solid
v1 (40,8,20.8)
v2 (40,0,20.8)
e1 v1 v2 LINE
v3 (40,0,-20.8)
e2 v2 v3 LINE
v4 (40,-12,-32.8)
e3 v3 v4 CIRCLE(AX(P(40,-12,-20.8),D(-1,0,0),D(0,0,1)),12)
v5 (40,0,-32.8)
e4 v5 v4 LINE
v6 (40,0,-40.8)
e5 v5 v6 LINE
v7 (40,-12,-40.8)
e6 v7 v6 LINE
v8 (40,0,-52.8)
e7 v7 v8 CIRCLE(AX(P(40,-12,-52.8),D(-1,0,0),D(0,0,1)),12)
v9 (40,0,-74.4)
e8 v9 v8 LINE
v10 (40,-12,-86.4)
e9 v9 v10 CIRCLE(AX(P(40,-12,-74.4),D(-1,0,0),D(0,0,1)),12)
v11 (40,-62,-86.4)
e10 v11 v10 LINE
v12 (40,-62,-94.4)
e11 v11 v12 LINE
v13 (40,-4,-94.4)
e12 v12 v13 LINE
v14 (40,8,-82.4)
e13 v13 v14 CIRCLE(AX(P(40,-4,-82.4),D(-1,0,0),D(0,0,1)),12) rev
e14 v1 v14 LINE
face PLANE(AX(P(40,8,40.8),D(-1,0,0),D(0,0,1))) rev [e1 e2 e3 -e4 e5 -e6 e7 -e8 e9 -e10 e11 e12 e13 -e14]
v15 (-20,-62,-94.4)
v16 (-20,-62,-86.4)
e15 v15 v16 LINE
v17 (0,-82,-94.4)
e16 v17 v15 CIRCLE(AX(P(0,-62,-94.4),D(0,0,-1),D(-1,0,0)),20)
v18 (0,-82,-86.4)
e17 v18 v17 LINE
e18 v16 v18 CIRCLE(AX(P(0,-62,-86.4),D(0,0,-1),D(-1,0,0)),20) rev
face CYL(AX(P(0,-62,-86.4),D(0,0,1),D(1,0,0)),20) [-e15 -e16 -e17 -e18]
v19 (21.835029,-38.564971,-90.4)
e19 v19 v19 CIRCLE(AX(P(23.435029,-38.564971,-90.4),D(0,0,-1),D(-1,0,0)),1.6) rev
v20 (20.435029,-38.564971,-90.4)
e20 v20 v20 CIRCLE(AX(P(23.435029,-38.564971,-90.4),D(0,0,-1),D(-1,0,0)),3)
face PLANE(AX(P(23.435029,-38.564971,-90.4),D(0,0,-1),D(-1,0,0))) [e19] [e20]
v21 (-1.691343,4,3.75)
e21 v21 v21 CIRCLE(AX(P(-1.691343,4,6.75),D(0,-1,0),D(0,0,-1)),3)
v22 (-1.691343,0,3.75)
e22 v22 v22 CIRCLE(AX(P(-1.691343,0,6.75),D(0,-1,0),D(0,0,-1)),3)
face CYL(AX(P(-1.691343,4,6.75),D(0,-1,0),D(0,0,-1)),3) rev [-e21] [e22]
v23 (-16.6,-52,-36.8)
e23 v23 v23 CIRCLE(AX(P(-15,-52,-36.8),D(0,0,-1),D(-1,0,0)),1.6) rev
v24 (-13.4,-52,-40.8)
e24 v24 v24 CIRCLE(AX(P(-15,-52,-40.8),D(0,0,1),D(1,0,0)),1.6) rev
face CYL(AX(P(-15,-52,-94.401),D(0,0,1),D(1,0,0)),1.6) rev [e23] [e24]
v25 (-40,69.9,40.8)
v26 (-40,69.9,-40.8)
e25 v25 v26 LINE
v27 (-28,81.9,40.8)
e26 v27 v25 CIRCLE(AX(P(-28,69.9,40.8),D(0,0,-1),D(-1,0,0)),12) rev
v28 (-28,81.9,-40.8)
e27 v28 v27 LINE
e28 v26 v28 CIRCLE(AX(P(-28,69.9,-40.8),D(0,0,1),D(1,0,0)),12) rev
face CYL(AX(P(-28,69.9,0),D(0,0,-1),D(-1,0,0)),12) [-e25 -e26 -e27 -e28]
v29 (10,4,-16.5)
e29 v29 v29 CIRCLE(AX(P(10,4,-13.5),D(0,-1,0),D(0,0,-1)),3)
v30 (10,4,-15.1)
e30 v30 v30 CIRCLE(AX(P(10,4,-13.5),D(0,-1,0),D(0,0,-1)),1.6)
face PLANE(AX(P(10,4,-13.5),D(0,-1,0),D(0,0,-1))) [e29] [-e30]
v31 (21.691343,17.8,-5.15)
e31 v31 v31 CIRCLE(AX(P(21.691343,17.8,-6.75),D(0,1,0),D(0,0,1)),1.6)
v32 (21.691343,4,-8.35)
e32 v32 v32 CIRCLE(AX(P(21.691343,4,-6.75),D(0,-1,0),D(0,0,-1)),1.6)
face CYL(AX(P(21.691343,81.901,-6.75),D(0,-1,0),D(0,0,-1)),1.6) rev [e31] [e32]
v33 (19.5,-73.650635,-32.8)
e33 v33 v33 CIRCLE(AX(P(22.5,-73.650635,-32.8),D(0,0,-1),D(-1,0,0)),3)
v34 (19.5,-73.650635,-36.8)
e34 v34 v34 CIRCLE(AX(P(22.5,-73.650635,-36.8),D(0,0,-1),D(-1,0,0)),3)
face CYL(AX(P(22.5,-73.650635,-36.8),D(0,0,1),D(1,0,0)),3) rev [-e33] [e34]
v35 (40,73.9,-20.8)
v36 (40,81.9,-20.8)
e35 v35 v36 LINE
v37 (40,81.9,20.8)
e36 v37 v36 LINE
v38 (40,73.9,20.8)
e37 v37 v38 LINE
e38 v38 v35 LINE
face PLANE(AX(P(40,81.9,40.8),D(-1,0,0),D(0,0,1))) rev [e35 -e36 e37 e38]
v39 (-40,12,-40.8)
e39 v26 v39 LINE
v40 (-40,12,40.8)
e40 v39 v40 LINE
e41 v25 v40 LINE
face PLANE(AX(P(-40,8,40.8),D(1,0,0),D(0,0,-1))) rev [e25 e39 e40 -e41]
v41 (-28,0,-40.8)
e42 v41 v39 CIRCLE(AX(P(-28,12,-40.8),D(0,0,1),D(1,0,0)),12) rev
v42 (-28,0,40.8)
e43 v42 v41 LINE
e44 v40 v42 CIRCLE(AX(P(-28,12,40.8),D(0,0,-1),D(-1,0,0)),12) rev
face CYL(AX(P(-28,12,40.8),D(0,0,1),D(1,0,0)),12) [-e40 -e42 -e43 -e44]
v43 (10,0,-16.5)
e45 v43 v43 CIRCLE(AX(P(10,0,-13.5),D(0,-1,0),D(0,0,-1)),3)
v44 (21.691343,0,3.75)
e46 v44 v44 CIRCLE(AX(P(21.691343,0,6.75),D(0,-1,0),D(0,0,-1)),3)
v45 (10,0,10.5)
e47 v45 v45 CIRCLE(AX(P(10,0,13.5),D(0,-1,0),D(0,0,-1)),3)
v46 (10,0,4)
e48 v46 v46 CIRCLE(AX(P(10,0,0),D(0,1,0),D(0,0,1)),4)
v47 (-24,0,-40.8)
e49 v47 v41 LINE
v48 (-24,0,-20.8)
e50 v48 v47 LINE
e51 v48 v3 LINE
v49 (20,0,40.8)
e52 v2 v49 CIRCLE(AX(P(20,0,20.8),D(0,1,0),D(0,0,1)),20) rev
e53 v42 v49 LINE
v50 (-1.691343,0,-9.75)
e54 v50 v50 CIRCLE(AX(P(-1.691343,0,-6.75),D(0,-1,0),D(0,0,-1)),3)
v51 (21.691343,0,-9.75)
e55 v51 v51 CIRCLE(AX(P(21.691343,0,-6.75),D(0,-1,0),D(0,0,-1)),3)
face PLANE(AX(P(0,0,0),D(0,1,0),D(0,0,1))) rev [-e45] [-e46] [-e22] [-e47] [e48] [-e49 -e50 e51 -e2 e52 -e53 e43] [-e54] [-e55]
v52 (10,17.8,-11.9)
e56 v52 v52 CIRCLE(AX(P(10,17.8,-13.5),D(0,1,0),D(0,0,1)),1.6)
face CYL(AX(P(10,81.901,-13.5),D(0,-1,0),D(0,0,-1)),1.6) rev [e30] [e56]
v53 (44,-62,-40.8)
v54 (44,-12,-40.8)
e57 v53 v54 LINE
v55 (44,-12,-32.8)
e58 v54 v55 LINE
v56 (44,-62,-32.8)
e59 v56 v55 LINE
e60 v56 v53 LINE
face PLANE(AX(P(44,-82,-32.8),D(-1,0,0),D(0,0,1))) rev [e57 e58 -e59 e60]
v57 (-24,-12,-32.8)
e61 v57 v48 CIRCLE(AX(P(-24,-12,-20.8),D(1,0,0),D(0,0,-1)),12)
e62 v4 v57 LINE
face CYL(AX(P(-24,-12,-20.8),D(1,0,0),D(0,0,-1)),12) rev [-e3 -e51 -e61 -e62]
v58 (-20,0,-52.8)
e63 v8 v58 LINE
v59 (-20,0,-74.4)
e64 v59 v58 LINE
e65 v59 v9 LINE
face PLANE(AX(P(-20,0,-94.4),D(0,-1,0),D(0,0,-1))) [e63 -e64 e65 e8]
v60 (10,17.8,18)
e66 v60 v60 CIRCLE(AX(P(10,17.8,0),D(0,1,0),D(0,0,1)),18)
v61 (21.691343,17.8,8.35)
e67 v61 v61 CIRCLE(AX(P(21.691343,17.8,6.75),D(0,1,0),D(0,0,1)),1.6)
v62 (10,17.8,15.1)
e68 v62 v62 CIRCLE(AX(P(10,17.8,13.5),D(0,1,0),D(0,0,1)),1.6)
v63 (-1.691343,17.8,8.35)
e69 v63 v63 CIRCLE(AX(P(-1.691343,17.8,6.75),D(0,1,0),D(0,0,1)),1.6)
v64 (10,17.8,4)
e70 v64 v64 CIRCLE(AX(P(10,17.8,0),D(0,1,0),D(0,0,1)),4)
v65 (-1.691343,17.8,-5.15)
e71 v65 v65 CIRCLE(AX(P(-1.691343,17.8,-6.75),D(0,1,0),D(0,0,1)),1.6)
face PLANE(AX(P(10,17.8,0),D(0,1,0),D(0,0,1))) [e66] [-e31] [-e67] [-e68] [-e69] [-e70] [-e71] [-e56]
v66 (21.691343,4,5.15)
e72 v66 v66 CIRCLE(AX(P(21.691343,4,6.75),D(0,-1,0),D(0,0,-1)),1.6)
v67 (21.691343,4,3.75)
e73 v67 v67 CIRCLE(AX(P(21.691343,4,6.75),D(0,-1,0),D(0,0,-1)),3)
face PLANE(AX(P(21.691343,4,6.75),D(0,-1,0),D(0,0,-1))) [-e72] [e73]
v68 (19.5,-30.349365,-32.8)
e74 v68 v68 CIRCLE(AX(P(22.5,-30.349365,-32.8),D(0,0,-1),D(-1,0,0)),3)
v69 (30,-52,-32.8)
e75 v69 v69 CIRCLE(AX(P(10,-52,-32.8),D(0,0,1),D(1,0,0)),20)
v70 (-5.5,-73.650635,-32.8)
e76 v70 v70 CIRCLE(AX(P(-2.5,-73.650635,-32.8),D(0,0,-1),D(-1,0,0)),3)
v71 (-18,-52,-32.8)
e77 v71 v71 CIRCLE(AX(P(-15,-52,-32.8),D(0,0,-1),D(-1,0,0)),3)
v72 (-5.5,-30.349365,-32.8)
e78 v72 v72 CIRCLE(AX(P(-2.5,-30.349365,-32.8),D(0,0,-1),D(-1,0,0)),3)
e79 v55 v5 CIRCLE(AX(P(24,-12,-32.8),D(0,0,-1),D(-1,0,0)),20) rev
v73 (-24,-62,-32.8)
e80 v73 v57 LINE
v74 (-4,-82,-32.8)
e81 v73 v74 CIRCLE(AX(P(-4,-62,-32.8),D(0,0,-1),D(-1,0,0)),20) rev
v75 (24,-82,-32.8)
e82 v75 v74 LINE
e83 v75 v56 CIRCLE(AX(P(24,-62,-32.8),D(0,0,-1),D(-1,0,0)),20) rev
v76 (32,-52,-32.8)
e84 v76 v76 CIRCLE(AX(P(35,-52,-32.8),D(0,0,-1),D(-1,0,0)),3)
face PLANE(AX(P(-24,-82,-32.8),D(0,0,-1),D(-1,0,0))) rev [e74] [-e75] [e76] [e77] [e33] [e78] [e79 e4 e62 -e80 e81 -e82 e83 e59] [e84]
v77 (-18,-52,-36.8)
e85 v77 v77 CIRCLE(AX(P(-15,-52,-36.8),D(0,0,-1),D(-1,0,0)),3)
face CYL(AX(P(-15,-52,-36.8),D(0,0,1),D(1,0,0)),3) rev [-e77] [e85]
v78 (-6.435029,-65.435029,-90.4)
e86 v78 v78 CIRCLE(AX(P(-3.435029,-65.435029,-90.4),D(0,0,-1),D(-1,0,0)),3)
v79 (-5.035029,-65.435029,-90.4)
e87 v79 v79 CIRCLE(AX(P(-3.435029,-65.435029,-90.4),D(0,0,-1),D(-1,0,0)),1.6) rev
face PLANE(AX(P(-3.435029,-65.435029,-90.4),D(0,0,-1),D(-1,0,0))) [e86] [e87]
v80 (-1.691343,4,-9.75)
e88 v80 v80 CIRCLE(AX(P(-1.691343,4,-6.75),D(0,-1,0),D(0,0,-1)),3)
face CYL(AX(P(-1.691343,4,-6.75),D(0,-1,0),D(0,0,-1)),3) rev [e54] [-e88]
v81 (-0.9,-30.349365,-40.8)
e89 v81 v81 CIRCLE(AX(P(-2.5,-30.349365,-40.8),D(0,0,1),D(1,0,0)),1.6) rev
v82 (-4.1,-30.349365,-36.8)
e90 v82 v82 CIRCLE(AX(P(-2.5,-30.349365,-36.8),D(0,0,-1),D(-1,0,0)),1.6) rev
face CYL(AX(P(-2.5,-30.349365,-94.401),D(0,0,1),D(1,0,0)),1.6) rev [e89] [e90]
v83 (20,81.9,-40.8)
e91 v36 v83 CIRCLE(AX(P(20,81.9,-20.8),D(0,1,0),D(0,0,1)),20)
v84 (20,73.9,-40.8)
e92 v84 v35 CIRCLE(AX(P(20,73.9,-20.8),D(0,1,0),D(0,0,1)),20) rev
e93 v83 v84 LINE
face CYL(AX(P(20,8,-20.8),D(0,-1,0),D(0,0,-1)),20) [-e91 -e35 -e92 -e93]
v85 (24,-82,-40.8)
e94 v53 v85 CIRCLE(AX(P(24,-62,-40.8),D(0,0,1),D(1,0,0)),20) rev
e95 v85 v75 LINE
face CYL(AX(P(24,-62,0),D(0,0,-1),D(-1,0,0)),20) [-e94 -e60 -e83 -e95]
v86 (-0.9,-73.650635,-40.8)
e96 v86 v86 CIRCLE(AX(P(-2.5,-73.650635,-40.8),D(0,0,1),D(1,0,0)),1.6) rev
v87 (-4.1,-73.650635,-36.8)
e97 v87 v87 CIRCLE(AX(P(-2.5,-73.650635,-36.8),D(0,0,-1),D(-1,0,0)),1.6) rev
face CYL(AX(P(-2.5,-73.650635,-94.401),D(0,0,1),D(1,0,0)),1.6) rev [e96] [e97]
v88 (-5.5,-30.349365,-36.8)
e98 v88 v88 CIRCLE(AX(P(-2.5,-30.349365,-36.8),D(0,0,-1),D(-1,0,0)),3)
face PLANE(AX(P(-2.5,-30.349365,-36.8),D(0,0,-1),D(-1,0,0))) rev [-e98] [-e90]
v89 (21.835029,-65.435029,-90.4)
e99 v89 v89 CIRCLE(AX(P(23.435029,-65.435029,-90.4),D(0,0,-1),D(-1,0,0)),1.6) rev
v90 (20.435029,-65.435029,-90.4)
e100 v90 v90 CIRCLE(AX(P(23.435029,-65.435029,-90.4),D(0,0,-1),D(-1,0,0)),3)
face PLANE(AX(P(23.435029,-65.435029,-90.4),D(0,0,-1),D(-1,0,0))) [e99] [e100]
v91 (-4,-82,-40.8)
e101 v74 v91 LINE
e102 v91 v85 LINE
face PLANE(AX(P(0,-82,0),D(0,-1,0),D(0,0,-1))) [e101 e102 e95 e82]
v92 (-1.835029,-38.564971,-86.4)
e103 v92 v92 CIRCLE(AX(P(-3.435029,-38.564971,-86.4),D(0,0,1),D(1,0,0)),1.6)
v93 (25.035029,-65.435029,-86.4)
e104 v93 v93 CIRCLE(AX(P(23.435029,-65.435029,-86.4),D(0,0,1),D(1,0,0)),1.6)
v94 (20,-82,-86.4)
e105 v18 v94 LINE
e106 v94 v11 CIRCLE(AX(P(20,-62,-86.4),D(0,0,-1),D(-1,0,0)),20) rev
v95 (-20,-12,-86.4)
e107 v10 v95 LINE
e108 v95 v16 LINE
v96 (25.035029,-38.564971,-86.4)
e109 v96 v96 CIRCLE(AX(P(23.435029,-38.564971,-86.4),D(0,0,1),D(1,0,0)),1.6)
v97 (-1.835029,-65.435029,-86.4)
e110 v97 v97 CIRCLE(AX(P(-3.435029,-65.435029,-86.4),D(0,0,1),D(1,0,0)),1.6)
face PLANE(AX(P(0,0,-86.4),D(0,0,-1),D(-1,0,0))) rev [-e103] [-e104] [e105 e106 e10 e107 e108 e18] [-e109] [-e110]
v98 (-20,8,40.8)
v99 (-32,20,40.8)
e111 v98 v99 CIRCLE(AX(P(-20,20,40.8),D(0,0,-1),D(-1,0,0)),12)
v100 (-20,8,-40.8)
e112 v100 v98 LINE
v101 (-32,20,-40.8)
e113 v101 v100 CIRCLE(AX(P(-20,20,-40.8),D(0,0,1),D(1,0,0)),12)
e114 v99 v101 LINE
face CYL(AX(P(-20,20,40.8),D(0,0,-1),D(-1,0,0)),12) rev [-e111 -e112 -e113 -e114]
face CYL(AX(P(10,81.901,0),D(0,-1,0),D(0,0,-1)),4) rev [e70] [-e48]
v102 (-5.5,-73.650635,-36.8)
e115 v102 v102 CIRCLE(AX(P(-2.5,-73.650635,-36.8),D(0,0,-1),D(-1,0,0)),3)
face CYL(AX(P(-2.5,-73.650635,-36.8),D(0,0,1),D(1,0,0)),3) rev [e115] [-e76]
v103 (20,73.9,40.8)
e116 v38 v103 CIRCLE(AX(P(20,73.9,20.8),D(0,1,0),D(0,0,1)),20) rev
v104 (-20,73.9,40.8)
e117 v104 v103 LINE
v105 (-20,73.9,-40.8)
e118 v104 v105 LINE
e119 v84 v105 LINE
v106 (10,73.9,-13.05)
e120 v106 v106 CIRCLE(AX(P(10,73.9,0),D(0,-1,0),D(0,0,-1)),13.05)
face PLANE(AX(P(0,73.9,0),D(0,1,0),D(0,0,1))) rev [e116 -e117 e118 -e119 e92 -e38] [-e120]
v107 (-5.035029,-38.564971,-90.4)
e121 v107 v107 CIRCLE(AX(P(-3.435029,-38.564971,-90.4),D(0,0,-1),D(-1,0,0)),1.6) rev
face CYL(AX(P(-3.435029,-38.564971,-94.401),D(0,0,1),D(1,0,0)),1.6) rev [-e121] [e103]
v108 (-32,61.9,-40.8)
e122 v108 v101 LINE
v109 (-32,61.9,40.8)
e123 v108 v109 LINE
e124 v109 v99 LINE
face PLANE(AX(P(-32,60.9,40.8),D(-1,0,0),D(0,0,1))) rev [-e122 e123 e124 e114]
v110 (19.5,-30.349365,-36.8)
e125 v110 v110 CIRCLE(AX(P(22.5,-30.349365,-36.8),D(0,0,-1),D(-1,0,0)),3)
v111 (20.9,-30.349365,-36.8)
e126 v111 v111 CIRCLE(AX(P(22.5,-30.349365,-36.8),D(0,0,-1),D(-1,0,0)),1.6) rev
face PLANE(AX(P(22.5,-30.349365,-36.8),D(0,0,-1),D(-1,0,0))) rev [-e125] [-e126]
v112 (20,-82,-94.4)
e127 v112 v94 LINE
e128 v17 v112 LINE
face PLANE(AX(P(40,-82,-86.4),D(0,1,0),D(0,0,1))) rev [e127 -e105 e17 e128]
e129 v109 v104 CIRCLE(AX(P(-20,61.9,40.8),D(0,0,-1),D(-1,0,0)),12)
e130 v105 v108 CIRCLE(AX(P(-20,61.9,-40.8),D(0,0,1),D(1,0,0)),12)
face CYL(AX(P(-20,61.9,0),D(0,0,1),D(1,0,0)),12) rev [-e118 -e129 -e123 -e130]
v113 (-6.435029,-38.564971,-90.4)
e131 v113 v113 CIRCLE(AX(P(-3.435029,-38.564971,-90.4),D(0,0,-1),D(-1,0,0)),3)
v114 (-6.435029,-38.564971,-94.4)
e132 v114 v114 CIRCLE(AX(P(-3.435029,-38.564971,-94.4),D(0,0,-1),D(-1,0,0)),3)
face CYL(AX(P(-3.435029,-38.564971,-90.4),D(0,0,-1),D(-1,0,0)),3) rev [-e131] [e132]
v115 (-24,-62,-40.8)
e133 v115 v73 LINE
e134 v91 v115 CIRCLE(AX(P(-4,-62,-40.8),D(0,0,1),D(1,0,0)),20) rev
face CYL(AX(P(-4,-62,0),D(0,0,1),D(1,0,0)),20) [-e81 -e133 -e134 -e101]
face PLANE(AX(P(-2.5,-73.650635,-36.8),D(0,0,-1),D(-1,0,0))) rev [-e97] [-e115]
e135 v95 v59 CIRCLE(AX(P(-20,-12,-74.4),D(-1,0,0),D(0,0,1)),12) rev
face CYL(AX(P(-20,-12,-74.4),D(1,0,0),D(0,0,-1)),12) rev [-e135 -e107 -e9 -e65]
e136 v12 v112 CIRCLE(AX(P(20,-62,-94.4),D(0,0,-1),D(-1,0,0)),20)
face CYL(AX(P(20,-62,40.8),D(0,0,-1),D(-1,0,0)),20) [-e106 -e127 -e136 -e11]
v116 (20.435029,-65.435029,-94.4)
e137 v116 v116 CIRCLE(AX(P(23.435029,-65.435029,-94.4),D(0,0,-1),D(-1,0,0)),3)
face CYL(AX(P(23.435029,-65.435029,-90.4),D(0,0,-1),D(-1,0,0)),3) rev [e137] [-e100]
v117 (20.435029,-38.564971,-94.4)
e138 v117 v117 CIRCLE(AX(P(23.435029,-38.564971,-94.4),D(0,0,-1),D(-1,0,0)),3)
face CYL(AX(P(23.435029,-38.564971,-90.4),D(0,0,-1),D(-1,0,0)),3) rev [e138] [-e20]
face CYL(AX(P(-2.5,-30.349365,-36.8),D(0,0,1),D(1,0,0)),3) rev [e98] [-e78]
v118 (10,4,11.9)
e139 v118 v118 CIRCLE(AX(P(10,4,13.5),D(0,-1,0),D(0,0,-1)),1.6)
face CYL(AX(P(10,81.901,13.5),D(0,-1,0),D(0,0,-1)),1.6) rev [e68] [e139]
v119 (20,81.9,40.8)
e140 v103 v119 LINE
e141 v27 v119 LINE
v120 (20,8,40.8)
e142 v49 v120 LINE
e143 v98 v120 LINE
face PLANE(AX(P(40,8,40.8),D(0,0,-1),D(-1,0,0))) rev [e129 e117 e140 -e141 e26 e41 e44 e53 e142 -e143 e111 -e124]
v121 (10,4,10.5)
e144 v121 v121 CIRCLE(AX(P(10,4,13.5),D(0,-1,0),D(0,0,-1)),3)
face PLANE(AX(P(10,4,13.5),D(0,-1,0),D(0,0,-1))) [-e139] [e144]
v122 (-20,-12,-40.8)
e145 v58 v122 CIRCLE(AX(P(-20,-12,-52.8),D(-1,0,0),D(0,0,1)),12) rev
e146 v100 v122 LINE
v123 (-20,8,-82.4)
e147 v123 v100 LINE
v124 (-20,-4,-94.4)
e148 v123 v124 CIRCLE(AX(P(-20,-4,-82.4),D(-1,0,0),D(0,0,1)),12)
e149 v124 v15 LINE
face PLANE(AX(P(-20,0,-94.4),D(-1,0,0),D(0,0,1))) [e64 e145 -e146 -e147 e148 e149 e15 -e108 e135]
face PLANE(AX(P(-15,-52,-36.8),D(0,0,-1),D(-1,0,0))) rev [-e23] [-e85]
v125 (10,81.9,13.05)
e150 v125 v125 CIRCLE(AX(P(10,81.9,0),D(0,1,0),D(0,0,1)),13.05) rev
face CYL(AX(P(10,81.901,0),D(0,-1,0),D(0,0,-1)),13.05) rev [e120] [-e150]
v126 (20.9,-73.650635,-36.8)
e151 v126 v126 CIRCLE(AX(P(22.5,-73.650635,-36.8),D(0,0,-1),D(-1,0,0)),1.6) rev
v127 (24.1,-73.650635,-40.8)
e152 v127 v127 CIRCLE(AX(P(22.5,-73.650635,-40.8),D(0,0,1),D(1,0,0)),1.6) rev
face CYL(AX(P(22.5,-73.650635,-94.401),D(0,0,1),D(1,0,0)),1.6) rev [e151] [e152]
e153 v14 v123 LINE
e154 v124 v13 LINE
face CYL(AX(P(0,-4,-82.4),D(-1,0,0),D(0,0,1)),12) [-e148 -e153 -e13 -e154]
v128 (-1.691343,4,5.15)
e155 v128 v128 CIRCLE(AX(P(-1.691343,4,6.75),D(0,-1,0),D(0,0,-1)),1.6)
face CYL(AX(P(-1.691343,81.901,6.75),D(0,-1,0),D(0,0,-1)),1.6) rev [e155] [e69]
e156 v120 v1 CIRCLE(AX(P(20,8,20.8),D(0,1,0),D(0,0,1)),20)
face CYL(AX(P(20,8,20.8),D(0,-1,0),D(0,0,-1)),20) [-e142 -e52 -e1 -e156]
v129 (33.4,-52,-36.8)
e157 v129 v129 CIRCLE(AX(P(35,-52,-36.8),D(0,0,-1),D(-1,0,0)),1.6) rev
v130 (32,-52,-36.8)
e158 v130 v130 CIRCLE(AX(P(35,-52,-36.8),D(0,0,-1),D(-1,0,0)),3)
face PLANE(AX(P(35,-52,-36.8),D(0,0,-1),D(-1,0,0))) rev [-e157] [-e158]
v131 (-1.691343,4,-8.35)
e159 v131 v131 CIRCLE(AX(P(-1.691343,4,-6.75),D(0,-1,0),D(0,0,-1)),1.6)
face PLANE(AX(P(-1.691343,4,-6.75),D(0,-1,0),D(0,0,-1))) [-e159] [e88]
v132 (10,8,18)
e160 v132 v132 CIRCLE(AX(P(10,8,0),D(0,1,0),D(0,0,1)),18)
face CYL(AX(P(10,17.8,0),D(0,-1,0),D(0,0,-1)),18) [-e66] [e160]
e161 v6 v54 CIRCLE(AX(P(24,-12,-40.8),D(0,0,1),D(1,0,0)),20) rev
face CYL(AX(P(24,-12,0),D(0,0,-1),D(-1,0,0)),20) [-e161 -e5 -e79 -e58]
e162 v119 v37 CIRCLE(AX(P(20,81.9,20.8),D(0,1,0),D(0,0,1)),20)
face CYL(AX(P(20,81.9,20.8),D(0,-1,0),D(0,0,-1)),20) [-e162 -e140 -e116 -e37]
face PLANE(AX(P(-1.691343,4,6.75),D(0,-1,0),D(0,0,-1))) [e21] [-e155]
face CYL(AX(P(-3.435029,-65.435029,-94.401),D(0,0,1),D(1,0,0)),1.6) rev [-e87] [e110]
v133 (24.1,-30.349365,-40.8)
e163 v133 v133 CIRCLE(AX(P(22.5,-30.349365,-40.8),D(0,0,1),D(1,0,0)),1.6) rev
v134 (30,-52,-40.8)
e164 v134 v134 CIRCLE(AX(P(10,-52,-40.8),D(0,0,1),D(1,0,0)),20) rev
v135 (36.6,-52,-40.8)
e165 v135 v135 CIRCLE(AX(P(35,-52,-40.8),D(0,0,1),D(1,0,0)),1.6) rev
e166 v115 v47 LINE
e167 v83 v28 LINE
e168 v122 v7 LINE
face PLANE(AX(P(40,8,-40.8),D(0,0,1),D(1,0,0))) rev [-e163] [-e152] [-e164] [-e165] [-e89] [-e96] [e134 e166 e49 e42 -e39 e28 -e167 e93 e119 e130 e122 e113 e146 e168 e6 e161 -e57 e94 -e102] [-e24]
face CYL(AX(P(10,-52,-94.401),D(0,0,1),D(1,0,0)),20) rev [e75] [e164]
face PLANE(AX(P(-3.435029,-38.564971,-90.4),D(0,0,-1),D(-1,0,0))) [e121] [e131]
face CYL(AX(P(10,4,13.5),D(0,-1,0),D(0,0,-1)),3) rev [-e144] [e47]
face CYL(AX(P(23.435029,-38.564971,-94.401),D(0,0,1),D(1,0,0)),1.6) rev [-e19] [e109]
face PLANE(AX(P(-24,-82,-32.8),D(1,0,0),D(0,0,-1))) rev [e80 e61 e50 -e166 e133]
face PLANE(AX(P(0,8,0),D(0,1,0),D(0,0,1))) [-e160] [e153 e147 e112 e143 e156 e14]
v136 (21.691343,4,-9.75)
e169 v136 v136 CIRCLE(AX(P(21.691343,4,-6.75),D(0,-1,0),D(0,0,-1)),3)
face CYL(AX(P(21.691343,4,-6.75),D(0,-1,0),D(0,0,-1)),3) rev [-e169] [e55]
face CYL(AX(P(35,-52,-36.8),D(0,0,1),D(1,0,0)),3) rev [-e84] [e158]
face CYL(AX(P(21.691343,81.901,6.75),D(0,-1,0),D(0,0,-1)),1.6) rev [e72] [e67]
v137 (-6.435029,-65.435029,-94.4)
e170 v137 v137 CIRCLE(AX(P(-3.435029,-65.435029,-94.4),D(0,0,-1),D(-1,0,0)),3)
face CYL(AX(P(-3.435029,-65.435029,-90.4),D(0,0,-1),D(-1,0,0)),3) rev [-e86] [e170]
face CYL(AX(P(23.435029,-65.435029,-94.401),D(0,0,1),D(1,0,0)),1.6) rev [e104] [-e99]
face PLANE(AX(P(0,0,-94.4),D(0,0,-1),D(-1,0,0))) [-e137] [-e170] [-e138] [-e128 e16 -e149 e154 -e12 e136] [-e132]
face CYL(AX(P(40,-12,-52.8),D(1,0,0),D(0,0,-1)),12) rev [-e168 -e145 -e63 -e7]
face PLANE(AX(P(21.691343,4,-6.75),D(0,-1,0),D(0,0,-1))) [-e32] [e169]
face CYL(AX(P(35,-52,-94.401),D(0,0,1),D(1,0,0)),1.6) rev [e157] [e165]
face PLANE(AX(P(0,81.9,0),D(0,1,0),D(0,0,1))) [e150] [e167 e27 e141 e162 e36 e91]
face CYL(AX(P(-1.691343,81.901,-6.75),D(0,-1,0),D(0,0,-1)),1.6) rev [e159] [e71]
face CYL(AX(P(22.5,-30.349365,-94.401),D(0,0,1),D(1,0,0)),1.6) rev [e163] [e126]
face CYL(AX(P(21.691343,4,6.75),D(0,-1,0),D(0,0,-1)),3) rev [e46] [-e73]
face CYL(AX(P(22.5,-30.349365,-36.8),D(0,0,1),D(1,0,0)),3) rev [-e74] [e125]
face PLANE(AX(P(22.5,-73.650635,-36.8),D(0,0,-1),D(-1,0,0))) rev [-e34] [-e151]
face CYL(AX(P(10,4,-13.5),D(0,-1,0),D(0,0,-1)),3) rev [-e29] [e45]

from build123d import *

# Parameters (mm, degrees)
SKETCH_1_W                      = 80
SKETCH_1_H                      = 81.6
EXTRUDE_1_DEPTH                 = 8
SKETCH_2_W                      = 8
SKETCH_2_H                      = 81.6
EXTRUDE_2_DEPTH                 = 52.9
SKETCH_10_W                     = 8
SKETCH_10_H                     = 81.6
EXTRUDE_7_DEPTH                 = 13
SKETCH_11_W                     = 80
SKETCH_11_H                     = 81.6
EXTRUDE_8_DEPTH                 = 8
SKETCH_6_R                      = 18
EXTRUDE_4_DEPTH                 = 9.8
SKETCH_4_R                      = 1.6
SKETCH_4_R_2                    = 4
CUT_EXTRUDE_1_DEPTH             = 94.412258296
CUT_EXTRUDE_1_DIRECTION_2_REACH = 95.412
CUT_EXTRUDE_3_REACH             = 95.412
SKETCH_12_R                     = 13.05
SKETCH_21_R                     = 3
CUT_EXTRUDE_10_DEPTH            = 4
SKETCH1_W                       = 68
SKETCH1_H                       = 8
BOSS_EXTRUDE1_DEPTH             = 82
SKETCH2_W                       = 60
SKETCH2_H                       = 8
BOSS_EXTRUDE2_DEPTH             = 53.6
SKETCH3_W                       = 60
SKETCH3_H                       = 90
BOSS_EXTRUDE3_DEPTH             = 8
CUT_EXTRUDE1_REACH              = 121.87
SKETCH4_R                       = 20
SKETCH4_R_2                     = 1.6
CUT_EXTRUDE2_REACH              = 176.266
SKETCH5_R                       = 1.6
SKETCH6_R                       = 3
CUT_EXTRUDE3_DEPTH              = 4
SKETCH7_R                       = 3
CUT_EXTRUDE4_DEPTH              = 4
FILLET1_R                       = 12
FILLET2_R                       = 20


with BuildPart() as part:
    # 草图1 → 凸台-拉伸1 (new body)
    with BuildSketch(Plane(origin=(0, 0, 0), x_dir=(1, 0, 0), z_dir=(0, 1, 0))):
        Rectangle(SKETCH_1_W, SKETCH_1_H)
    extrude(amount=EXTRUDE_1_DEPTH)

    # 草图2 → 凸台-拉伸2 (add)
    with BuildSketch(Plane(origin=(0, 8, 0), x_dir=(1, 0, 0), z_dir=(0, 1, 0))):
        with Locations((-36, 0)):
            Rectangle(SKETCH_2_W, SKETCH_2_H)
    extrude(amount=EXTRUDE_2_DEPTH)

    # 草图10 → 凸台-拉伸7 (add)
    with BuildSketch(Plane(origin=(0, 60.9, 0), x_dir=(1, 0, 0), z_dir=(0, 1, 0))):
        with Locations((-36, 0)):
            Rectangle(SKETCH_10_W, SKETCH_10_H)
    extrude(amount=EXTRUDE_7_DEPTH)

    # 草图11 → 凸台-拉伸8 (add)
    with BuildSketch(Plane(origin=(0, 73.9, 0), x_dir=(1, 0, 0), z_dir=(0, 1, 0))):
        Rectangle(SKETCH_11_W, SKETCH_11_H)
    extrude(amount=EXTRUDE_8_DEPTH)

    # 草图6 → 凸台-拉伸4 (add)
    with BuildSketch(Plane(origin=(0, 8, 0), x_dir=(1, 0, 0), z_dir=(0, 1, 0))):
        with Locations(Location((10, 0, 0), (0, 0, 270))):
            Circle(SKETCH_6_R)
    extrude(amount=EXTRUDE_4_DEPTH)

    # 草图4 → 切除-拉伸1 (cut)
    with BuildSketch(Plane(origin=(0, 8, 0), x_dir=(1, 0, 0), z_dir=(0, 1, 0))):
        with Locations(Location((10, 13.5, 0), (0, 0, 270))):
            Circle(SKETCH_4_R)
        with Locations(Location((21.691342951, 6.75, 0), (0, 0, 270))):
            Circle(SKETCH_4_R)
        with Locations(Location((21.691342951, -6.75, 0), (0, 0, 270))):
            Circle(SKETCH_4_R)
        with Locations(Location((10, -13.5, 0), (0, 0, 270))):
            Circle(SKETCH_4_R)
        with Locations(Location((-1.691342951, -6.75, 0), (0, 0, 270))):
            Circle(SKETCH_4_R)
        with Locations(Location((-1.691342951, 6.75, 0), (0, 0, 270))):
            Circle(SKETCH_4_R)
        with Locations(Location((10, 0, 0), (0, 0, 270))):
            Circle(SKETCH_4_R_2)
    extrude(amount=-CUT_EXTRUDE_1_DEPTH, mode=Mode.SUBTRACT)

    # 草图4 → 切除-拉伸1 direction 2 (cut, up to next)
    with BuildSketch(Plane(origin=(0, 8, 0), x_dir=(1, 0, 0), z_dir=(0, 1, 0)), mode=Mode.PRIVATE) as cut_extrude_1_direction_2_sk1:
        with Locations(Location((10, 13.5, 0), (0, 0, 270))):
            Circle(SKETCH_4_R)
    cut_extrude_1_direction_2_tool1 = extrude(cut_extrude_1_direction_2_sk1.sketch, amount=CUT_EXTRUDE_1_DIRECTION_2_REACH, mode=Mode.PRIVATE) & part.part
    # 草图4 → 切除-拉伸1 direction 2 (cut, up to next)
    with BuildSketch(Plane(origin=(0, 8, 0), x_dir=(1, 0, 0), z_dir=(0, 1, 0)), mode=Mode.PRIVATE) as cut_extrude_1_direction_2_sk2:
        with Locations(Location((21.691342951, 6.75, 0), (0, 0, 270))):
            Circle(SKETCH_4_R)
    cut_extrude_1_direction_2_tool2 = extrude(cut_extrude_1_direction_2_sk2.sketch, amount=CUT_EXTRUDE_1_DIRECTION_2_REACH, mode=Mode.PRIVATE) & part.part
    # 草图4 → 切除-拉伸1 direction 2 (cut, up to next)
    with BuildSketch(Plane(origin=(0, 8, 0), x_dir=(1, 0, 0), z_dir=(0, 1, 0)), mode=Mode.PRIVATE) as cut_extrude_1_direction_2_sk3:
        with Locations(Location((21.691342951, -6.75, 0), (0, 0, 270))):
            Circle(SKETCH_4_R)
    cut_extrude_1_direction_2_tool3 = extrude(cut_extrude_1_direction_2_sk3.sketch, amount=CUT_EXTRUDE_1_DIRECTION_2_REACH, mode=Mode.PRIVATE) & part.part
    # 草图4 → 切除-拉伸1 direction 2 (cut, up to next)
    with BuildSketch(Plane(origin=(0, 8, 0), x_dir=(1, 0, 0), z_dir=(0, 1, 0)), mode=Mode.PRIVATE) as cut_extrude_1_direction_2_sk4:
        with Locations(Location((10, -13.5, 0), (0, 0, 270))):
            Circle(SKETCH_4_R)
    cut_extrude_1_direction_2_tool4 = extrude(cut_extrude_1_direction_2_sk4.sketch, amount=CUT_EXTRUDE_1_DIRECTION_2_REACH, mode=Mode.PRIVATE) & part.part
    # 草图4 → 切除-拉伸1 direction 2 (cut, up to next)
    with BuildSketch(Plane(origin=(0, 8, 0), x_dir=(1, 0, 0), z_dir=(0, 1, 0)), mode=Mode.PRIVATE) as cut_extrude_1_direction_2_sk5:
        with Locations(Location((-1.691342951, -6.75, 0), (0, 0, 270))):
            Circle(SKETCH_4_R)
    cut_extrude_1_direction_2_tool5 = extrude(cut_extrude_1_direction_2_sk5.sketch, amount=CUT_EXTRUDE_1_DIRECTION_2_REACH, mode=Mode.PRIVATE) & part.part
    # 草图4 → 切除-拉伸1 direction 2 (cut, up to next)
    with BuildSketch(Plane(origin=(0, 8, 0), x_dir=(1, 0, 0), z_dir=(0, 1, 0)), mode=Mode.PRIVATE) as cut_extrude_1_direction_2_sk6:
        with Locations(Location((-1.691342951, 6.75, 0), (0, 0, 270))):
            Circle(SKETCH_4_R)
    cut_extrude_1_direction_2_tool6 = extrude(cut_extrude_1_direction_2_sk6.sketch, amount=CUT_EXTRUDE_1_DIRECTION_2_REACH, mode=Mode.PRIVATE) & part.part
    # 草图4 → 切除-拉伸1 direction 2 (cut, up to next)
    with BuildSketch(Plane(origin=(0, 8, 0), x_dir=(1, 0, 0), z_dir=(0, 1, 0)), mode=Mode.PRIVATE) as cut_extrude_1_direction_2_sk7:
        with Locations(Location((10, 0, 0), (0, 0, 270))):
            Circle(SKETCH_4_R_2)
    cut_extrude_1_direction_2_tool7 = extrude(cut_extrude_1_direction_2_sk7.sketch, amount=CUT_EXTRUDE_1_DIRECTION_2_REACH, mode=Mode.PRIVATE) & part.part
    add(cut_extrude_1_direction_2_tool1.solids().sort_by_distance((10, 8, -13.5))[0], mode=Mode.SUBTRACT)
    add(cut_extrude_1_direction_2_tool2.solids().sort_by_distance((21.691343, 8, -6.75))[0], mode=Mode.SUBTRACT)
    add(cut_extrude_1_direction_2_tool3.solids().sort_by_distance((21.691343, 8, 6.75))[0], mode=Mode.SUBTRACT)
    add(cut_extrude_1_direction_2_tool4.solids().sort_by_distance((10, 8, 13.5))[0], mode=Mode.SUBTRACT)
    add(cut_extrude_1_direction_2_tool5.solids().sort_by_distance((-1.691343, 8, 6.75))[0], mode=Mode.SUBTRACT)
    add(cut_extrude_1_direction_2_tool6.solids().sort_by_distance((-1.691343, 8, -6.75))[0], mode=Mode.SUBTRACT)
    add(cut_extrude_1_direction_2_tool7.solids().sort_by_distance((10, 8, 0))[0], mode=Mode.SUBTRACT)

    # 草图12 → 切除-拉伸3 (cut, up to next)
    with BuildSketch(Plane(origin=(0, 73.9, 0), x_dir=(-1, 0, 0), z_dir=(0, -1, 0)), mode=Mode.PRIVATE) as cut_extrude_3_sk1:
        with Locations(Location((-10, 0, 0), (0, 0, 90))):
            Circle(SKETCH_12_R)
    cut_extrude_3_tool1 = extrude(cut_extrude_3_sk1.sketch, amount=-CUT_EXTRUDE_3_REACH, mode=Mode.PRIVATE) & part.part
    add(cut_extrude_3_tool1.solids().sort_by_distance((10, 73.9, 0))[0], mode=Mode.SUBTRACT)

    # 草图21 → 切除-拉伸10 (cut)
    with BuildSketch(Plane(origin=(0, 0, 0), x_dir=(-1, 0, 0), z_dir=(0, -1, 0))):
        with Locations(Location((-10, -13.5, 0), (0, 0, 90))):
            Circle(SKETCH_21_R)
        with Locations(Location((-21.691342951, -6.75, 0), (0, 0, 90))):
            Circle(SKETCH_21_R)
        with Locations(Location((-21.691342951, 6.75, 0), (0, 0, 90))):
            Circle(SKETCH_21_R)
        with Locations(Location((-10, 13.5, 0), (0, 0, 90))):
            Circle(SKETCH_21_R)
        with Locations(Location((1.691342951, 6.75, 0), (0, 0, 90))):
            Circle(SKETCH_21_R)
        with Locations(Location((1.691342951, -6.75, 0), (0, 0, 90))):
            Circle(SKETCH_21_R)
    extrude(amount=-CUT_EXTRUDE_10_DEPTH, mode=Mode.SUBTRACT)

    # Sketch1 → Boss-Extrude1 (add)
    with BuildSketch(Plane(origin=(0, 0, 0), x_dir=(-1, 0, 0), z_dir=(0, -1, 0))):
        with Locations((-10, 36.8)):
            Rectangle(SKETCH1_W, SKETCH1_H)
    extrude(amount=BOSS_EXTRUDE1_DEPTH)

    # Sketch2 → Boss-Extrude2 (add)
    with BuildSketch(Plane(origin=(0.8, 0, -40.8), x_dir=(1, 0, 0), z_dir=(0, 0, 1))):
        with Locations((9.2, 4)):
            Rectangle(SKETCH2_W, SKETCH2_H)
    extrude(amount=-BOSS_EXTRUDE2_DEPTH)

    # Sketch3 → Boss-Extrude3 (add)
    with BuildSketch(Plane(origin=(0, 94.4, -94.4), x_dir=(-1, 0, 0), z_dir=(0, 0, 1))):
        with Locations((-10, 131.4)):
            Rectangle(SKETCH3_W, SKETCH3_H)
    extrude(amount=BOSS_EXTRUDE3_DEPTH)

    # Sketch4 → Cut-Extrude1 (cut, up to next)
    with BuildSketch(Plane(origin=(7.2, 0, -32.8), x_dir=(1, 0, 0), z_dir=(0, 0, 1)), mode=Mode.PRIVATE) as cut_extrude1_sk1:
        with Locations((2.8, -52)):
            Circle(SKETCH4_R)
    cut_extrude1_tool1 = extrude(cut_extrude1_sk1.sketch, amount=-CUT_EXTRUDE1_REACH, mode=Mode.PRIVATE) & part.part
    # Sketch4 → Cut-Extrude1 (cut, up to next)
    with BuildSketch(Plane(origin=(7.2, 0, -32.8), x_dir=(1, 0, 0), z_dir=(0, 0, 1)), mode=Mode.PRIVATE) as cut_extrude1_sk2:
        with Locations((27.8, -52)):
            Circle(SKETCH4_R_2)
    cut_extrude1_tool2 = extrude(cut_extrude1_sk2.sketch, amount=-CUT_EXTRUDE1_REACH, mode=Mode.PRIVATE) & part.part
    # Sketch4 → Cut-Extrude1 (cut, up to next)
    with BuildSketch(Plane(origin=(7.2, 0, -32.8), x_dir=(1, 0, 0), z_dir=(0, 0, 1)), mode=Mode.PRIVATE) as cut_extrude1_sk3:
        with Locations((15.3, -73.650635095)):
            Circle(SKETCH4_R_2)
    cut_extrude1_tool3 = extrude(cut_extrude1_sk3.sketch, amount=-CUT_EXTRUDE1_REACH, mode=Mode.PRIVATE) & part.part
    # Sketch4 → Cut-Extrude1 (cut, up to next)
    with BuildSketch(Plane(origin=(7.2, 0, -32.8), x_dir=(1, 0, 0), z_dir=(0, 0, 1)), mode=Mode.PRIVATE) as cut_extrude1_sk4:
        with Locations((-9.7, -73.650635095)):
            Circle(SKETCH4_R_2)
    cut_extrude1_tool4 = extrude(cut_extrude1_sk4.sketch, amount=-CUT_EXTRUDE1_REACH, mode=Mode.PRIVATE) & part.part
    # Sketch4 → Cut-Extrude1 (cut, up to next)
    with BuildSketch(Plane(origin=(7.2, 0, -32.8), x_dir=(1, 0, 0), z_dir=(0, 0, 1)), mode=Mode.PRIVATE) as cut_extrude1_sk5:
        with Locations((-22.2, -52)):
            Circle(SKETCH4_R_2)
    cut_extrude1_tool5 = extrude(cut_extrude1_sk5.sketch, amount=-CUT_EXTRUDE1_REACH, mode=Mode.PRIVATE) & part.part
    # Sketch4 → Cut-Extrude1 (cut, up to next)
    with BuildSketch(Plane(origin=(7.2, 0, -32.8), x_dir=(1, 0, 0), z_dir=(0, 0, 1)), mode=Mode.PRIVATE) as cut_extrude1_sk6:
        with Locations((-9.7, -30.349364905)):
            Circle(SKETCH4_R_2)
    cut_extrude1_tool6 = extrude(cut_extrude1_sk6.sketch, amount=-CUT_EXTRUDE1_REACH, mode=Mode.PRIVATE) & part.part
    # Sketch4 → Cut-Extrude1 (cut, up to next)
    with BuildSketch(Plane(origin=(7.2, 0, -32.8), x_dir=(1, 0, 0), z_dir=(0, 0, 1)), mode=Mode.PRIVATE) as cut_extrude1_sk7:
        with Locations((15.3, -30.349364905)):
            Circle(SKETCH4_R_2)
    cut_extrude1_tool7 = extrude(cut_extrude1_sk7.sketch, amount=-CUT_EXTRUDE1_REACH, mode=Mode.PRIVATE) & part.part
    add(cut_extrude1_tool1.solids().sort_by_distance((10, -52, -32.8))[0], mode=Mode.SUBTRACT)
    add(cut_extrude1_tool2.solids().sort_by_distance((35, -52, -32.8))[0], mode=Mode.SUBTRACT)
    add(cut_extrude1_tool3.solids().sort_by_distance((22.5, -73.650635, -32.8))[0], mode=Mode.SUBTRACT)
    add(cut_extrude1_tool4.solids().sort_by_distance((-2.5, -73.650635, -32.8))[0], mode=Mode.SUBTRACT)
    add(cut_extrude1_tool5.solids().sort_by_distance((-15, -52, -32.8))[0], mode=Mode.SUBTRACT)
    add(cut_extrude1_tool6.solids().sort_by_distance((-2.5, -30.349365, -32.8))[0], mode=Mode.SUBTRACT)
    add(cut_extrude1_tool7.solids().sort_by_distance((22.5, -30.349365, -32.8))[0], mode=Mode.SUBTRACT)

    # Sketch5 → Cut-Extrude2 (cut, up to next)
    with BuildSketch(Plane(origin=(46.4, 0, -86.4), x_dir=(1, 0, 0), z_dir=(0, 0, 1)), mode=Mode.PRIVATE) as cut_extrude2_sk1:
        with Locations((-49.835028843, -38.564971157)):
            Circle(SKETCH5_R)
    cut_extrude2_tool1 = extrude(cut_extrude2_sk1.sketch, amount=-CUT_EXTRUDE2_REACH, mode=Mode.PRIVATE) & part.part
    # Sketch5 → Cut-Extrude2 (cut, up to next)
    with BuildSketch(Plane(origin=(46.4, 0, -86.4), x_dir=(1, 0, 0), z_dir=(0, 0, 1)), mode=Mode.PRIVATE) as cut_extrude2_sk2:
        with Locations((-22.964971157, -38.564971157)):
            Circle(SKETCH5_R)
    cut_extrude2_tool2 = extrude(cut_extrude2_sk2.sketch, amount=-CUT_EXTRUDE2_REACH, mode=Mode.PRIVATE) & part.part
    # Sketch5 → Cut-Extrude2 (cut, up to next)
    with BuildSketch(Plane(origin=(46.4, 0, -86.4), x_dir=(1, 0, 0), z_dir=(0, 0, 1)), mode=Mode.PRIVATE) as cut_extrude2_sk3:
        with Locations((-22.964971157, -65.435028843)):
            Circle(SKETCH5_R)
    cut_extrude2_tool3 = extrude(cut_extrude2_sk3.sketch, amount=-CUT_EXTRUDE2_REACH, mode=Mode.PRIVATE) & part.part
    # Sketch5 → Cut-Extrude2 (cut, up to next)
    with BuildSketch(Plane(origin=(46.4, 0, -86.4), x_dir=(1, 0, 0), z_dir=(0, 0, 1)), mode=Mode.PRIVATE) as cut_extrude2_sk4:
        with Locations((-49.835028843, -65.435028843)):
            Circle(SKETCH5_R)
    cut_extrude2_tool4 = extrude(cut_extrude2_sk4.sketch, amount=-CUT_EXTRUDE2_REACH, mode=Mode.PRIVATE) & part.part
    add(cut_extrude2_tool1.solids().sort_by_distance((-3.435029, -38.564971, -86.4))[0], mode=Mode.SUBTRACT)
    add(cut_extrude2_tool2.solids().sort_by_distance((23.435029, -38.564971, -86.4))[0], mode=Mode.SUBTRACT)
    add(cut_extrude2_tool3.solids().sort_by_distance((23.435029, -65.435029, -86.4))[0], mode=Mode.SUBTRACT)
    add(cut_extrude2_tool4.solids().sort_by_distance((-3.435029, -65.435029, -86.4))[0], mode=Mode.SUBTRACT)

    # Sketch6 → Cut-Extrude3 (cut)
    with BuildSketch(Plane(origin=(0, 0, -94.4), x_dir=(-1, 0, 0), z_dir=(0, 0, -1))):
        with Locations((-23.435028843, -38.564971157)):
            Circle(SKETCH6_R)
        with Locations((3.435028843, -38.564971157)):
            Circle(SKETCH6_R)
        with Locations((3.435028843, -65.435028843)):
            Circle(SKETCH6_R)
        with Locations((-23.435028843, -65.435028843)):
            Circle(SKETCH6_R)
    extrude(amount=-CUT_EXTRUDE3_DEPTH, mode=Mode.SUBTRACT)

    # Sketch7 → Cut-Extrude4 (cut)
    with BuildSketch(Plane(origin=(72.8, 0, -32.8), x_dir=(-1, 0, 0), z_dir=(0, 0, -1))):
        with Locations((75.3, -30.349364905)):
            Circle(SKETCH7_R)
        with Locations((87.8, -52)):
            Circle(SKETCH7_R)
        with Locations((75.3, -73.650635095)):
            Circle(SKETCH7_R)
        with Locations((50.3, -73.650635095)):
            Circle(SKETCH7_R)
        with Locations((37.8, -52)):
            Circle(SKETCH7_R)
        with Locations((50.3, -30.349364905)):
            Circle(SKETCH7_R)
    extrude(amount=CUT_EXTRUDE4_DEPTH, mode=Mode.SUBTRACT)

    # Fillet1
    fillet1_edges = [part.edges().sort_by_distance(p)[0] for p in [
        (-32, 8, 0),
        (10, 8, -94.4),
        (-32, 73.9, 0),
        (-40, 81.9, 0),
        (-40, 0, 0),
        (8, 0, -32.8),
        (10, 0, -40.8),
        (10, 0, -86.4),
    ]]
    fillet(fillet1_edges, radius=FILLET1_R)

    # Fillet2
    # the kernel refuses this fillet: 20 mm, written as the material it takes off along each edge
    with BuildSketch(Plane(origin=(40, -50, 40.8), x_dir=(-1, 0, 0), z_dir=(0, 1, 0)), Plane(origin=(40, 23.9, 40.8), x_dir=(-1, 0, 0), z_dir=(0, 1, 0)), Plane(origin=(-24, -82, -90.8), x_dir=(0, 1, 0), z_dir=(0, 0, 1))) as fillet2_piece_1:
        with BuildLine():
            CenterArc((FILLET2_R, -FILLET2_R), FILLET2_R, 90, 90)
            Line((0, -FILLET2_R), (0, 0))
            Line((0, 0), (FILLET2_R, 0))
        make_face()
    extrude(amount=108, mode=Mode.SUBTRACT)
    with BuildSketch(Plane(origin=(40, 23.9, -40.8), x_dir=(-1, 0, 0), z_dir=(0, 1, 0)), Plane(origin=(44, -82, 17.2), x_dir=(-1, 0, 0), z_dir=(0, 0, -1))) as fillet2_piece_2:
        with BuildLine():
            CenterArc((FILLET2_R, FILLET2_R), FILLET2_R, 180, 90)
            Line((0, FILLET2_R), (0, 0))
            Line((0, 0), (FILLET2_R, 0))
        make_face()
    extrude(amount=108, mode=Mode.SUBTRACT)
    with BuildSketch(Plane(origin=(-20, -82, -144.4), x_dir=(1, 0, 0), z_dir=(0, 0, 1))) as fillet2_piece_3:
        with BuildLine():
            CenterArc((FILLET2_R, FILLET2_R), FILLET2_R, 180, 90)
            Line((0, FILLET2_R), (0, 0))
            Line((0, 0), (FILLET2_R, 0))
        make_face()
    extrude(amount=58, mode=Mode.SUBTRACT)
    with BuildSketch(Plane(origin=(40, -82, -144.4), x_dir=(-1, 0, 0), z_dir=(0, 0, 1))) as fillet2_piece_4:
        with BuildLine():
            CenterArc((FILLET2_R, -FILLET2_R), FILLET2_R, 90, 90)
            Line((0, -FILLET2_R), (0, 0))
            Line((0, 0), (FILLET2_R, 0))
        make_face()
    extrude(amount=58, mode=Mode.SUBTRACT)
    with BuildSketch(Plane(origin=(44, 0, -2.8), x_dir=(0, -1, 0), z_dir=(0, 0, -1))) as fillet2_piece_5:
        with BuildLine():
            CenterArc((12, 20), FILLET2_R, 233.130102354, 36.869897646)
            Line((0, 4), (0, 0))
            Line((0, 0), (12, 0))
        make_face()
    extrude(amount=68, mode=Mode.SUBTRACT)


solid = part.part
